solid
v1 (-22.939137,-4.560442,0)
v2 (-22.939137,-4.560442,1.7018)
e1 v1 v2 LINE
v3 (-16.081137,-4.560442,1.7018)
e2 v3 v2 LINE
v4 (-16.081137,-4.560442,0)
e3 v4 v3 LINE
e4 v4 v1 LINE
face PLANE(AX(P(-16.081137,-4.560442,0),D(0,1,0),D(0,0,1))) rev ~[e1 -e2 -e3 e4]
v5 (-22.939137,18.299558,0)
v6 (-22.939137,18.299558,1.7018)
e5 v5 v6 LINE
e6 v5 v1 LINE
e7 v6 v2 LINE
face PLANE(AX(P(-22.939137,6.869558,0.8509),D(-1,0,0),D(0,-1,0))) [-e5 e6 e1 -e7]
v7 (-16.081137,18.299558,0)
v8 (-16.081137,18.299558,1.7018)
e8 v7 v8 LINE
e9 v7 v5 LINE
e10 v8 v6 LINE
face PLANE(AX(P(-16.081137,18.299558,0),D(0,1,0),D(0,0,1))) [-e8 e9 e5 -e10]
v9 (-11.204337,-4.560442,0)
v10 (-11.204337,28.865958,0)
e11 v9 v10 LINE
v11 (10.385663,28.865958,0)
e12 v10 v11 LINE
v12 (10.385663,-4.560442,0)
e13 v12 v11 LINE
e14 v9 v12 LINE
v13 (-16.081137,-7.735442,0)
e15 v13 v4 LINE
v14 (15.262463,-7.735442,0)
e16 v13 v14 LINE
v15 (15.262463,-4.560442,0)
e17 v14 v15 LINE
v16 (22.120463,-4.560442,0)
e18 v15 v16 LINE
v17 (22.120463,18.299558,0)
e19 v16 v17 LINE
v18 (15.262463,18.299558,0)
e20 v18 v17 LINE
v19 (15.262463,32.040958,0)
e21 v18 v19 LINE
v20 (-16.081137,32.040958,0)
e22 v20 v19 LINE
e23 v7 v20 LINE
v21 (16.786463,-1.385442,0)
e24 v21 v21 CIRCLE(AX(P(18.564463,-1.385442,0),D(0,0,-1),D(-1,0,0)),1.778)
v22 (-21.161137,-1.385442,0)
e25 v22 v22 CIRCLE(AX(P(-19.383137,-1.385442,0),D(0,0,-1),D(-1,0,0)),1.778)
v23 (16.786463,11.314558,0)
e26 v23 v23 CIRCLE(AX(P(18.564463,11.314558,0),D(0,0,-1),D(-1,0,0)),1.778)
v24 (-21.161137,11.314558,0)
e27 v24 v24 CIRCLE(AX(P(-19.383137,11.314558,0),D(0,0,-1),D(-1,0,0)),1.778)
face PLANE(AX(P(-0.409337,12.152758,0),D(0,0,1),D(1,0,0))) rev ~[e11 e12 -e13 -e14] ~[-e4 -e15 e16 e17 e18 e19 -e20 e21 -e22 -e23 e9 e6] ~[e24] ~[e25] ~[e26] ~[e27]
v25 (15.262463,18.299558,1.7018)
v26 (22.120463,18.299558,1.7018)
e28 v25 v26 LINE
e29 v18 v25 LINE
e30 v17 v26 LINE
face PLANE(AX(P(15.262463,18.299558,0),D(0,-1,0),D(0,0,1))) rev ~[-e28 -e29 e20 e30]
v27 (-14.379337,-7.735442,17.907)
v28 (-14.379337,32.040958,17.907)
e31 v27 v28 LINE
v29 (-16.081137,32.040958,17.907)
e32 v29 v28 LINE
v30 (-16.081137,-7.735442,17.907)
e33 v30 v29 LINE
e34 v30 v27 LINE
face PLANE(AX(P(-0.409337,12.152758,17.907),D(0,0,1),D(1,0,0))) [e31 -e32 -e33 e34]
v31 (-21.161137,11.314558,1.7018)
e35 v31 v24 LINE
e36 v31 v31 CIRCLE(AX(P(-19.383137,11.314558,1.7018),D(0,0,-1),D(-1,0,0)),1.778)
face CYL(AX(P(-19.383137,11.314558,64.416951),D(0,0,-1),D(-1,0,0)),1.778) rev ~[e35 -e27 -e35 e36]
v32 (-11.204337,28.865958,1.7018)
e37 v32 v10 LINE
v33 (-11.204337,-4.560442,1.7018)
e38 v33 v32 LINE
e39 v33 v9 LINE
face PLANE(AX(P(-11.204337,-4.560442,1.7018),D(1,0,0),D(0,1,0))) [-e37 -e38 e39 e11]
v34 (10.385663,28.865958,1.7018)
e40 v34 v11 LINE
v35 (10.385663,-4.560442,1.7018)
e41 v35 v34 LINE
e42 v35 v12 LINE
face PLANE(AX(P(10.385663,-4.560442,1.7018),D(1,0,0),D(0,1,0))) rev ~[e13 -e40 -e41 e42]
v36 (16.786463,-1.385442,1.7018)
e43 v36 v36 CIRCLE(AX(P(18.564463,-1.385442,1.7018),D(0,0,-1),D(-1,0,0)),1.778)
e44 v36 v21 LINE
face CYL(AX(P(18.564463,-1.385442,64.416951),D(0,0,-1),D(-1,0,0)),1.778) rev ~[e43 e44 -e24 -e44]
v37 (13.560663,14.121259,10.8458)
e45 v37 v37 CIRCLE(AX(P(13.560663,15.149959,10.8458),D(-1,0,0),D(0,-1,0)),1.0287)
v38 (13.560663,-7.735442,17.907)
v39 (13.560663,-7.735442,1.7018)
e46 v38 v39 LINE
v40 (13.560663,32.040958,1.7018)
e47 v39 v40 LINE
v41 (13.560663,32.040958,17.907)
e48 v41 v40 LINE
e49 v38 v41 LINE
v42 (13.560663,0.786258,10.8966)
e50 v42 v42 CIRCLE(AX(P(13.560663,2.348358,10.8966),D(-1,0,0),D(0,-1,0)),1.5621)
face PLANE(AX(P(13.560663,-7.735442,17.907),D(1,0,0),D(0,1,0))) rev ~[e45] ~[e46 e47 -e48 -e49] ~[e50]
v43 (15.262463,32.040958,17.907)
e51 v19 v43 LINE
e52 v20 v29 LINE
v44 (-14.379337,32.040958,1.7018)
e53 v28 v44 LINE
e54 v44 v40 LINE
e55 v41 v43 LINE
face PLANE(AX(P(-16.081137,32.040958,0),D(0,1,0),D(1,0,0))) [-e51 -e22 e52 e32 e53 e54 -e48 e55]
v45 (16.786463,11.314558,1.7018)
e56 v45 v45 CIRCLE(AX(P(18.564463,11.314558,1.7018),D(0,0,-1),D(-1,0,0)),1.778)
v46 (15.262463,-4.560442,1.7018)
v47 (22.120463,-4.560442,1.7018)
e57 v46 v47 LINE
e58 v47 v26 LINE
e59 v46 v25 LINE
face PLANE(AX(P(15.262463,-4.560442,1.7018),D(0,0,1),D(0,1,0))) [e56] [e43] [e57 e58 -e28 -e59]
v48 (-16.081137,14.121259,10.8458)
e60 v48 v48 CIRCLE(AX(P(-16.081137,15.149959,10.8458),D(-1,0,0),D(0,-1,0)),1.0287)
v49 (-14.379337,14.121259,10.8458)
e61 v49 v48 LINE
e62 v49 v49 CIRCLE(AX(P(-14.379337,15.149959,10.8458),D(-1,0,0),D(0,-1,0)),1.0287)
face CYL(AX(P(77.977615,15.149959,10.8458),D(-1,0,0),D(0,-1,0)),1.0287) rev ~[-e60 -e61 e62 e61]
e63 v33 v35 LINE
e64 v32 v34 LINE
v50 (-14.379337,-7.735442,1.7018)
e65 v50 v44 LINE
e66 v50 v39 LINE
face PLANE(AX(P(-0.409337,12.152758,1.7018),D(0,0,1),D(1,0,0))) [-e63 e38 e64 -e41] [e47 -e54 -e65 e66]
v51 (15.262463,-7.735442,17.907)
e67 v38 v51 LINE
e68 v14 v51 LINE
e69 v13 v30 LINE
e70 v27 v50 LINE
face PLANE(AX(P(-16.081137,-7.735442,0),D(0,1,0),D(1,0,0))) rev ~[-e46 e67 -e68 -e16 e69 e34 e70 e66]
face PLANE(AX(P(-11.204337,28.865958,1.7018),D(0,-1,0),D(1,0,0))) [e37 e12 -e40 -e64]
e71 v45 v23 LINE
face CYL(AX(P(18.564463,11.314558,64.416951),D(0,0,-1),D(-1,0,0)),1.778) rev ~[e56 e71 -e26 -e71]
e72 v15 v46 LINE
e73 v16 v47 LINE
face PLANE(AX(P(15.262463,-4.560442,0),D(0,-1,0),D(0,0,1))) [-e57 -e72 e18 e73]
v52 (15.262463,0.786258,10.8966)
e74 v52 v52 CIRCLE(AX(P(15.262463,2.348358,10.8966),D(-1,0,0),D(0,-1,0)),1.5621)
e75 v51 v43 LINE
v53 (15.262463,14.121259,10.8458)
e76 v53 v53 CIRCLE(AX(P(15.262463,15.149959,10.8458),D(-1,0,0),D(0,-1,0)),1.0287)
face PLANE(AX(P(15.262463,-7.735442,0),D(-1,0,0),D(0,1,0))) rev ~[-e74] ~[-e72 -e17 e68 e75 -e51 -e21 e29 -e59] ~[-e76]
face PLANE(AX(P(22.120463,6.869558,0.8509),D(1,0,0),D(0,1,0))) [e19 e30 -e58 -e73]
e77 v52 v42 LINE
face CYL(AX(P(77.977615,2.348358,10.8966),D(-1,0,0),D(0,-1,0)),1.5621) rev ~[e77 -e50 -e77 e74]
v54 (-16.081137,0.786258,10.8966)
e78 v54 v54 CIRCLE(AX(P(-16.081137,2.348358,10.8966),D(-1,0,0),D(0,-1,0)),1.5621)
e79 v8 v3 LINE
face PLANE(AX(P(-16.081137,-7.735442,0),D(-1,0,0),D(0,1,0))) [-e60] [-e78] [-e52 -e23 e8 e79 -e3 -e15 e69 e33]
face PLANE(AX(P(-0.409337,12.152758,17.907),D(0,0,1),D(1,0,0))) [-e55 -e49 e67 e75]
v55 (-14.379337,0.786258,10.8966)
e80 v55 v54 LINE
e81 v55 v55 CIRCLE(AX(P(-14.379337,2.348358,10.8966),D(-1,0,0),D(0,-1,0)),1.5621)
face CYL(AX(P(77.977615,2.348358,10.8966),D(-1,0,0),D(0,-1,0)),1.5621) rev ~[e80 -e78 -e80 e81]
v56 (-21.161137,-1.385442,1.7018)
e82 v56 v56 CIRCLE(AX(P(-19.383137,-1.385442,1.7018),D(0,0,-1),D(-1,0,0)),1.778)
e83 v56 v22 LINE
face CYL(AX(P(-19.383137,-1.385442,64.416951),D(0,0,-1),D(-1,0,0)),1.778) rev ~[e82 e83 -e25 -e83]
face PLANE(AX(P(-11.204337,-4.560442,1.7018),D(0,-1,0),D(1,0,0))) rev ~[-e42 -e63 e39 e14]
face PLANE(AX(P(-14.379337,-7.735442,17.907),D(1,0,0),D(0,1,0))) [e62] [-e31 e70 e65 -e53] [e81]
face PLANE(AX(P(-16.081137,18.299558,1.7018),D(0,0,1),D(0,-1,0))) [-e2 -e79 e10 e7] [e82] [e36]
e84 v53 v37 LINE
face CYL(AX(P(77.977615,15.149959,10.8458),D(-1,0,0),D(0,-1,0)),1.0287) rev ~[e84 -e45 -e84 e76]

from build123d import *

# Parameters (mm, degrees)
F0_W      = 31.3436
F0_H      = 39.7764
F1_DEPTH  = 17.907
F2_W      = 27.94
F2_H      = 39.7764
F3_DEPTH  = 16.2052
F4_W      = 22.86
F4_H      = 1.7018
F5_DEPTH  = 6.858
F6_W      = 22.86
F6_H      = 1.7018
F7_DEPTH  = 6.858
F9_D      = 3.556
F11_D     = 3.1242
F13_D     = 2.0574
F14_W     = 21.59
F14_H     = 33.4264
F15_DEPTH = 25.4


with BuildPart() as f1:
    # F0 (on Top) → F1 (new body)
    with BuildSketch(Plane.XY):
        with Locations((-0.4093366692, 12.1527582612)):
            Rectangle(F0_W, F0_H)
    extrude(amount=F1_DEPTH)

    # F2 (on face) → F3 (cut)
    with BuildSketch(Plane.XY.offset(17.907)):
        with Locations((-0.4093366692, 12.1527582612)):
            Rectangle(F2_W, F2_H)
    extrude(amount=-F3_DEPTH, mode=Mode.SUBTRACT)

    # F4 (on face) → F5 (join)
    with BuildSketch(Plane(origin=(-16.0811366692, 0, 0), x_dir=(0, -1, 0), z_dir=(-1, 0, 0))):
        with Locations((-6.8695582612, 0.8509)):
            Rectangle(F4_W, F4_H)
    extrude(amount=F5_DEPTH)

    # F6 (on face) → F7 (join)
    with BuildSketch(Plane.YZ.offset(15.2624633308)):
        with Locations((6.8695582612, 0.8509)):
            Rectangle(F6_W, F6_H)
    extrude(amount=F7_DEPTH)

    # F9 (through all)
    with Locations(Plane.XY.offset(1.7018)):
        with Locations((-19.3831366692, -1.3854417388), (18.5644633308, -1.3854417388), (18.5644633308, 11.3145582612), (-19.3831366692, 11.3145582612)):
            Hole(F9_D / 2)

    # F11 (through all)
    with Locations(Plane.YZ.offset(15.2624633308)):
        with Locations((2.3483582612, 10.8966)):
            Hole(F11_D / 2)

    # F13 (through all)
    with Locations(Plane.YZ.offset(15.2624633308)):
        with Locations((15.1499590679, 10.8458)):
            Hole(F13_D / 2)

    # F14 (on face) → F15 (cut)
    with BuildSketch(Plane.XY.offset(1.7018)):
        with Locations((-0.4093366692, 12.1527582612)):
            Rectangle(F14_W, F14_H)
    extrude(amount=-F15_DEPTH, mode=Mode.SUBTRACT)


solid = f1.part
